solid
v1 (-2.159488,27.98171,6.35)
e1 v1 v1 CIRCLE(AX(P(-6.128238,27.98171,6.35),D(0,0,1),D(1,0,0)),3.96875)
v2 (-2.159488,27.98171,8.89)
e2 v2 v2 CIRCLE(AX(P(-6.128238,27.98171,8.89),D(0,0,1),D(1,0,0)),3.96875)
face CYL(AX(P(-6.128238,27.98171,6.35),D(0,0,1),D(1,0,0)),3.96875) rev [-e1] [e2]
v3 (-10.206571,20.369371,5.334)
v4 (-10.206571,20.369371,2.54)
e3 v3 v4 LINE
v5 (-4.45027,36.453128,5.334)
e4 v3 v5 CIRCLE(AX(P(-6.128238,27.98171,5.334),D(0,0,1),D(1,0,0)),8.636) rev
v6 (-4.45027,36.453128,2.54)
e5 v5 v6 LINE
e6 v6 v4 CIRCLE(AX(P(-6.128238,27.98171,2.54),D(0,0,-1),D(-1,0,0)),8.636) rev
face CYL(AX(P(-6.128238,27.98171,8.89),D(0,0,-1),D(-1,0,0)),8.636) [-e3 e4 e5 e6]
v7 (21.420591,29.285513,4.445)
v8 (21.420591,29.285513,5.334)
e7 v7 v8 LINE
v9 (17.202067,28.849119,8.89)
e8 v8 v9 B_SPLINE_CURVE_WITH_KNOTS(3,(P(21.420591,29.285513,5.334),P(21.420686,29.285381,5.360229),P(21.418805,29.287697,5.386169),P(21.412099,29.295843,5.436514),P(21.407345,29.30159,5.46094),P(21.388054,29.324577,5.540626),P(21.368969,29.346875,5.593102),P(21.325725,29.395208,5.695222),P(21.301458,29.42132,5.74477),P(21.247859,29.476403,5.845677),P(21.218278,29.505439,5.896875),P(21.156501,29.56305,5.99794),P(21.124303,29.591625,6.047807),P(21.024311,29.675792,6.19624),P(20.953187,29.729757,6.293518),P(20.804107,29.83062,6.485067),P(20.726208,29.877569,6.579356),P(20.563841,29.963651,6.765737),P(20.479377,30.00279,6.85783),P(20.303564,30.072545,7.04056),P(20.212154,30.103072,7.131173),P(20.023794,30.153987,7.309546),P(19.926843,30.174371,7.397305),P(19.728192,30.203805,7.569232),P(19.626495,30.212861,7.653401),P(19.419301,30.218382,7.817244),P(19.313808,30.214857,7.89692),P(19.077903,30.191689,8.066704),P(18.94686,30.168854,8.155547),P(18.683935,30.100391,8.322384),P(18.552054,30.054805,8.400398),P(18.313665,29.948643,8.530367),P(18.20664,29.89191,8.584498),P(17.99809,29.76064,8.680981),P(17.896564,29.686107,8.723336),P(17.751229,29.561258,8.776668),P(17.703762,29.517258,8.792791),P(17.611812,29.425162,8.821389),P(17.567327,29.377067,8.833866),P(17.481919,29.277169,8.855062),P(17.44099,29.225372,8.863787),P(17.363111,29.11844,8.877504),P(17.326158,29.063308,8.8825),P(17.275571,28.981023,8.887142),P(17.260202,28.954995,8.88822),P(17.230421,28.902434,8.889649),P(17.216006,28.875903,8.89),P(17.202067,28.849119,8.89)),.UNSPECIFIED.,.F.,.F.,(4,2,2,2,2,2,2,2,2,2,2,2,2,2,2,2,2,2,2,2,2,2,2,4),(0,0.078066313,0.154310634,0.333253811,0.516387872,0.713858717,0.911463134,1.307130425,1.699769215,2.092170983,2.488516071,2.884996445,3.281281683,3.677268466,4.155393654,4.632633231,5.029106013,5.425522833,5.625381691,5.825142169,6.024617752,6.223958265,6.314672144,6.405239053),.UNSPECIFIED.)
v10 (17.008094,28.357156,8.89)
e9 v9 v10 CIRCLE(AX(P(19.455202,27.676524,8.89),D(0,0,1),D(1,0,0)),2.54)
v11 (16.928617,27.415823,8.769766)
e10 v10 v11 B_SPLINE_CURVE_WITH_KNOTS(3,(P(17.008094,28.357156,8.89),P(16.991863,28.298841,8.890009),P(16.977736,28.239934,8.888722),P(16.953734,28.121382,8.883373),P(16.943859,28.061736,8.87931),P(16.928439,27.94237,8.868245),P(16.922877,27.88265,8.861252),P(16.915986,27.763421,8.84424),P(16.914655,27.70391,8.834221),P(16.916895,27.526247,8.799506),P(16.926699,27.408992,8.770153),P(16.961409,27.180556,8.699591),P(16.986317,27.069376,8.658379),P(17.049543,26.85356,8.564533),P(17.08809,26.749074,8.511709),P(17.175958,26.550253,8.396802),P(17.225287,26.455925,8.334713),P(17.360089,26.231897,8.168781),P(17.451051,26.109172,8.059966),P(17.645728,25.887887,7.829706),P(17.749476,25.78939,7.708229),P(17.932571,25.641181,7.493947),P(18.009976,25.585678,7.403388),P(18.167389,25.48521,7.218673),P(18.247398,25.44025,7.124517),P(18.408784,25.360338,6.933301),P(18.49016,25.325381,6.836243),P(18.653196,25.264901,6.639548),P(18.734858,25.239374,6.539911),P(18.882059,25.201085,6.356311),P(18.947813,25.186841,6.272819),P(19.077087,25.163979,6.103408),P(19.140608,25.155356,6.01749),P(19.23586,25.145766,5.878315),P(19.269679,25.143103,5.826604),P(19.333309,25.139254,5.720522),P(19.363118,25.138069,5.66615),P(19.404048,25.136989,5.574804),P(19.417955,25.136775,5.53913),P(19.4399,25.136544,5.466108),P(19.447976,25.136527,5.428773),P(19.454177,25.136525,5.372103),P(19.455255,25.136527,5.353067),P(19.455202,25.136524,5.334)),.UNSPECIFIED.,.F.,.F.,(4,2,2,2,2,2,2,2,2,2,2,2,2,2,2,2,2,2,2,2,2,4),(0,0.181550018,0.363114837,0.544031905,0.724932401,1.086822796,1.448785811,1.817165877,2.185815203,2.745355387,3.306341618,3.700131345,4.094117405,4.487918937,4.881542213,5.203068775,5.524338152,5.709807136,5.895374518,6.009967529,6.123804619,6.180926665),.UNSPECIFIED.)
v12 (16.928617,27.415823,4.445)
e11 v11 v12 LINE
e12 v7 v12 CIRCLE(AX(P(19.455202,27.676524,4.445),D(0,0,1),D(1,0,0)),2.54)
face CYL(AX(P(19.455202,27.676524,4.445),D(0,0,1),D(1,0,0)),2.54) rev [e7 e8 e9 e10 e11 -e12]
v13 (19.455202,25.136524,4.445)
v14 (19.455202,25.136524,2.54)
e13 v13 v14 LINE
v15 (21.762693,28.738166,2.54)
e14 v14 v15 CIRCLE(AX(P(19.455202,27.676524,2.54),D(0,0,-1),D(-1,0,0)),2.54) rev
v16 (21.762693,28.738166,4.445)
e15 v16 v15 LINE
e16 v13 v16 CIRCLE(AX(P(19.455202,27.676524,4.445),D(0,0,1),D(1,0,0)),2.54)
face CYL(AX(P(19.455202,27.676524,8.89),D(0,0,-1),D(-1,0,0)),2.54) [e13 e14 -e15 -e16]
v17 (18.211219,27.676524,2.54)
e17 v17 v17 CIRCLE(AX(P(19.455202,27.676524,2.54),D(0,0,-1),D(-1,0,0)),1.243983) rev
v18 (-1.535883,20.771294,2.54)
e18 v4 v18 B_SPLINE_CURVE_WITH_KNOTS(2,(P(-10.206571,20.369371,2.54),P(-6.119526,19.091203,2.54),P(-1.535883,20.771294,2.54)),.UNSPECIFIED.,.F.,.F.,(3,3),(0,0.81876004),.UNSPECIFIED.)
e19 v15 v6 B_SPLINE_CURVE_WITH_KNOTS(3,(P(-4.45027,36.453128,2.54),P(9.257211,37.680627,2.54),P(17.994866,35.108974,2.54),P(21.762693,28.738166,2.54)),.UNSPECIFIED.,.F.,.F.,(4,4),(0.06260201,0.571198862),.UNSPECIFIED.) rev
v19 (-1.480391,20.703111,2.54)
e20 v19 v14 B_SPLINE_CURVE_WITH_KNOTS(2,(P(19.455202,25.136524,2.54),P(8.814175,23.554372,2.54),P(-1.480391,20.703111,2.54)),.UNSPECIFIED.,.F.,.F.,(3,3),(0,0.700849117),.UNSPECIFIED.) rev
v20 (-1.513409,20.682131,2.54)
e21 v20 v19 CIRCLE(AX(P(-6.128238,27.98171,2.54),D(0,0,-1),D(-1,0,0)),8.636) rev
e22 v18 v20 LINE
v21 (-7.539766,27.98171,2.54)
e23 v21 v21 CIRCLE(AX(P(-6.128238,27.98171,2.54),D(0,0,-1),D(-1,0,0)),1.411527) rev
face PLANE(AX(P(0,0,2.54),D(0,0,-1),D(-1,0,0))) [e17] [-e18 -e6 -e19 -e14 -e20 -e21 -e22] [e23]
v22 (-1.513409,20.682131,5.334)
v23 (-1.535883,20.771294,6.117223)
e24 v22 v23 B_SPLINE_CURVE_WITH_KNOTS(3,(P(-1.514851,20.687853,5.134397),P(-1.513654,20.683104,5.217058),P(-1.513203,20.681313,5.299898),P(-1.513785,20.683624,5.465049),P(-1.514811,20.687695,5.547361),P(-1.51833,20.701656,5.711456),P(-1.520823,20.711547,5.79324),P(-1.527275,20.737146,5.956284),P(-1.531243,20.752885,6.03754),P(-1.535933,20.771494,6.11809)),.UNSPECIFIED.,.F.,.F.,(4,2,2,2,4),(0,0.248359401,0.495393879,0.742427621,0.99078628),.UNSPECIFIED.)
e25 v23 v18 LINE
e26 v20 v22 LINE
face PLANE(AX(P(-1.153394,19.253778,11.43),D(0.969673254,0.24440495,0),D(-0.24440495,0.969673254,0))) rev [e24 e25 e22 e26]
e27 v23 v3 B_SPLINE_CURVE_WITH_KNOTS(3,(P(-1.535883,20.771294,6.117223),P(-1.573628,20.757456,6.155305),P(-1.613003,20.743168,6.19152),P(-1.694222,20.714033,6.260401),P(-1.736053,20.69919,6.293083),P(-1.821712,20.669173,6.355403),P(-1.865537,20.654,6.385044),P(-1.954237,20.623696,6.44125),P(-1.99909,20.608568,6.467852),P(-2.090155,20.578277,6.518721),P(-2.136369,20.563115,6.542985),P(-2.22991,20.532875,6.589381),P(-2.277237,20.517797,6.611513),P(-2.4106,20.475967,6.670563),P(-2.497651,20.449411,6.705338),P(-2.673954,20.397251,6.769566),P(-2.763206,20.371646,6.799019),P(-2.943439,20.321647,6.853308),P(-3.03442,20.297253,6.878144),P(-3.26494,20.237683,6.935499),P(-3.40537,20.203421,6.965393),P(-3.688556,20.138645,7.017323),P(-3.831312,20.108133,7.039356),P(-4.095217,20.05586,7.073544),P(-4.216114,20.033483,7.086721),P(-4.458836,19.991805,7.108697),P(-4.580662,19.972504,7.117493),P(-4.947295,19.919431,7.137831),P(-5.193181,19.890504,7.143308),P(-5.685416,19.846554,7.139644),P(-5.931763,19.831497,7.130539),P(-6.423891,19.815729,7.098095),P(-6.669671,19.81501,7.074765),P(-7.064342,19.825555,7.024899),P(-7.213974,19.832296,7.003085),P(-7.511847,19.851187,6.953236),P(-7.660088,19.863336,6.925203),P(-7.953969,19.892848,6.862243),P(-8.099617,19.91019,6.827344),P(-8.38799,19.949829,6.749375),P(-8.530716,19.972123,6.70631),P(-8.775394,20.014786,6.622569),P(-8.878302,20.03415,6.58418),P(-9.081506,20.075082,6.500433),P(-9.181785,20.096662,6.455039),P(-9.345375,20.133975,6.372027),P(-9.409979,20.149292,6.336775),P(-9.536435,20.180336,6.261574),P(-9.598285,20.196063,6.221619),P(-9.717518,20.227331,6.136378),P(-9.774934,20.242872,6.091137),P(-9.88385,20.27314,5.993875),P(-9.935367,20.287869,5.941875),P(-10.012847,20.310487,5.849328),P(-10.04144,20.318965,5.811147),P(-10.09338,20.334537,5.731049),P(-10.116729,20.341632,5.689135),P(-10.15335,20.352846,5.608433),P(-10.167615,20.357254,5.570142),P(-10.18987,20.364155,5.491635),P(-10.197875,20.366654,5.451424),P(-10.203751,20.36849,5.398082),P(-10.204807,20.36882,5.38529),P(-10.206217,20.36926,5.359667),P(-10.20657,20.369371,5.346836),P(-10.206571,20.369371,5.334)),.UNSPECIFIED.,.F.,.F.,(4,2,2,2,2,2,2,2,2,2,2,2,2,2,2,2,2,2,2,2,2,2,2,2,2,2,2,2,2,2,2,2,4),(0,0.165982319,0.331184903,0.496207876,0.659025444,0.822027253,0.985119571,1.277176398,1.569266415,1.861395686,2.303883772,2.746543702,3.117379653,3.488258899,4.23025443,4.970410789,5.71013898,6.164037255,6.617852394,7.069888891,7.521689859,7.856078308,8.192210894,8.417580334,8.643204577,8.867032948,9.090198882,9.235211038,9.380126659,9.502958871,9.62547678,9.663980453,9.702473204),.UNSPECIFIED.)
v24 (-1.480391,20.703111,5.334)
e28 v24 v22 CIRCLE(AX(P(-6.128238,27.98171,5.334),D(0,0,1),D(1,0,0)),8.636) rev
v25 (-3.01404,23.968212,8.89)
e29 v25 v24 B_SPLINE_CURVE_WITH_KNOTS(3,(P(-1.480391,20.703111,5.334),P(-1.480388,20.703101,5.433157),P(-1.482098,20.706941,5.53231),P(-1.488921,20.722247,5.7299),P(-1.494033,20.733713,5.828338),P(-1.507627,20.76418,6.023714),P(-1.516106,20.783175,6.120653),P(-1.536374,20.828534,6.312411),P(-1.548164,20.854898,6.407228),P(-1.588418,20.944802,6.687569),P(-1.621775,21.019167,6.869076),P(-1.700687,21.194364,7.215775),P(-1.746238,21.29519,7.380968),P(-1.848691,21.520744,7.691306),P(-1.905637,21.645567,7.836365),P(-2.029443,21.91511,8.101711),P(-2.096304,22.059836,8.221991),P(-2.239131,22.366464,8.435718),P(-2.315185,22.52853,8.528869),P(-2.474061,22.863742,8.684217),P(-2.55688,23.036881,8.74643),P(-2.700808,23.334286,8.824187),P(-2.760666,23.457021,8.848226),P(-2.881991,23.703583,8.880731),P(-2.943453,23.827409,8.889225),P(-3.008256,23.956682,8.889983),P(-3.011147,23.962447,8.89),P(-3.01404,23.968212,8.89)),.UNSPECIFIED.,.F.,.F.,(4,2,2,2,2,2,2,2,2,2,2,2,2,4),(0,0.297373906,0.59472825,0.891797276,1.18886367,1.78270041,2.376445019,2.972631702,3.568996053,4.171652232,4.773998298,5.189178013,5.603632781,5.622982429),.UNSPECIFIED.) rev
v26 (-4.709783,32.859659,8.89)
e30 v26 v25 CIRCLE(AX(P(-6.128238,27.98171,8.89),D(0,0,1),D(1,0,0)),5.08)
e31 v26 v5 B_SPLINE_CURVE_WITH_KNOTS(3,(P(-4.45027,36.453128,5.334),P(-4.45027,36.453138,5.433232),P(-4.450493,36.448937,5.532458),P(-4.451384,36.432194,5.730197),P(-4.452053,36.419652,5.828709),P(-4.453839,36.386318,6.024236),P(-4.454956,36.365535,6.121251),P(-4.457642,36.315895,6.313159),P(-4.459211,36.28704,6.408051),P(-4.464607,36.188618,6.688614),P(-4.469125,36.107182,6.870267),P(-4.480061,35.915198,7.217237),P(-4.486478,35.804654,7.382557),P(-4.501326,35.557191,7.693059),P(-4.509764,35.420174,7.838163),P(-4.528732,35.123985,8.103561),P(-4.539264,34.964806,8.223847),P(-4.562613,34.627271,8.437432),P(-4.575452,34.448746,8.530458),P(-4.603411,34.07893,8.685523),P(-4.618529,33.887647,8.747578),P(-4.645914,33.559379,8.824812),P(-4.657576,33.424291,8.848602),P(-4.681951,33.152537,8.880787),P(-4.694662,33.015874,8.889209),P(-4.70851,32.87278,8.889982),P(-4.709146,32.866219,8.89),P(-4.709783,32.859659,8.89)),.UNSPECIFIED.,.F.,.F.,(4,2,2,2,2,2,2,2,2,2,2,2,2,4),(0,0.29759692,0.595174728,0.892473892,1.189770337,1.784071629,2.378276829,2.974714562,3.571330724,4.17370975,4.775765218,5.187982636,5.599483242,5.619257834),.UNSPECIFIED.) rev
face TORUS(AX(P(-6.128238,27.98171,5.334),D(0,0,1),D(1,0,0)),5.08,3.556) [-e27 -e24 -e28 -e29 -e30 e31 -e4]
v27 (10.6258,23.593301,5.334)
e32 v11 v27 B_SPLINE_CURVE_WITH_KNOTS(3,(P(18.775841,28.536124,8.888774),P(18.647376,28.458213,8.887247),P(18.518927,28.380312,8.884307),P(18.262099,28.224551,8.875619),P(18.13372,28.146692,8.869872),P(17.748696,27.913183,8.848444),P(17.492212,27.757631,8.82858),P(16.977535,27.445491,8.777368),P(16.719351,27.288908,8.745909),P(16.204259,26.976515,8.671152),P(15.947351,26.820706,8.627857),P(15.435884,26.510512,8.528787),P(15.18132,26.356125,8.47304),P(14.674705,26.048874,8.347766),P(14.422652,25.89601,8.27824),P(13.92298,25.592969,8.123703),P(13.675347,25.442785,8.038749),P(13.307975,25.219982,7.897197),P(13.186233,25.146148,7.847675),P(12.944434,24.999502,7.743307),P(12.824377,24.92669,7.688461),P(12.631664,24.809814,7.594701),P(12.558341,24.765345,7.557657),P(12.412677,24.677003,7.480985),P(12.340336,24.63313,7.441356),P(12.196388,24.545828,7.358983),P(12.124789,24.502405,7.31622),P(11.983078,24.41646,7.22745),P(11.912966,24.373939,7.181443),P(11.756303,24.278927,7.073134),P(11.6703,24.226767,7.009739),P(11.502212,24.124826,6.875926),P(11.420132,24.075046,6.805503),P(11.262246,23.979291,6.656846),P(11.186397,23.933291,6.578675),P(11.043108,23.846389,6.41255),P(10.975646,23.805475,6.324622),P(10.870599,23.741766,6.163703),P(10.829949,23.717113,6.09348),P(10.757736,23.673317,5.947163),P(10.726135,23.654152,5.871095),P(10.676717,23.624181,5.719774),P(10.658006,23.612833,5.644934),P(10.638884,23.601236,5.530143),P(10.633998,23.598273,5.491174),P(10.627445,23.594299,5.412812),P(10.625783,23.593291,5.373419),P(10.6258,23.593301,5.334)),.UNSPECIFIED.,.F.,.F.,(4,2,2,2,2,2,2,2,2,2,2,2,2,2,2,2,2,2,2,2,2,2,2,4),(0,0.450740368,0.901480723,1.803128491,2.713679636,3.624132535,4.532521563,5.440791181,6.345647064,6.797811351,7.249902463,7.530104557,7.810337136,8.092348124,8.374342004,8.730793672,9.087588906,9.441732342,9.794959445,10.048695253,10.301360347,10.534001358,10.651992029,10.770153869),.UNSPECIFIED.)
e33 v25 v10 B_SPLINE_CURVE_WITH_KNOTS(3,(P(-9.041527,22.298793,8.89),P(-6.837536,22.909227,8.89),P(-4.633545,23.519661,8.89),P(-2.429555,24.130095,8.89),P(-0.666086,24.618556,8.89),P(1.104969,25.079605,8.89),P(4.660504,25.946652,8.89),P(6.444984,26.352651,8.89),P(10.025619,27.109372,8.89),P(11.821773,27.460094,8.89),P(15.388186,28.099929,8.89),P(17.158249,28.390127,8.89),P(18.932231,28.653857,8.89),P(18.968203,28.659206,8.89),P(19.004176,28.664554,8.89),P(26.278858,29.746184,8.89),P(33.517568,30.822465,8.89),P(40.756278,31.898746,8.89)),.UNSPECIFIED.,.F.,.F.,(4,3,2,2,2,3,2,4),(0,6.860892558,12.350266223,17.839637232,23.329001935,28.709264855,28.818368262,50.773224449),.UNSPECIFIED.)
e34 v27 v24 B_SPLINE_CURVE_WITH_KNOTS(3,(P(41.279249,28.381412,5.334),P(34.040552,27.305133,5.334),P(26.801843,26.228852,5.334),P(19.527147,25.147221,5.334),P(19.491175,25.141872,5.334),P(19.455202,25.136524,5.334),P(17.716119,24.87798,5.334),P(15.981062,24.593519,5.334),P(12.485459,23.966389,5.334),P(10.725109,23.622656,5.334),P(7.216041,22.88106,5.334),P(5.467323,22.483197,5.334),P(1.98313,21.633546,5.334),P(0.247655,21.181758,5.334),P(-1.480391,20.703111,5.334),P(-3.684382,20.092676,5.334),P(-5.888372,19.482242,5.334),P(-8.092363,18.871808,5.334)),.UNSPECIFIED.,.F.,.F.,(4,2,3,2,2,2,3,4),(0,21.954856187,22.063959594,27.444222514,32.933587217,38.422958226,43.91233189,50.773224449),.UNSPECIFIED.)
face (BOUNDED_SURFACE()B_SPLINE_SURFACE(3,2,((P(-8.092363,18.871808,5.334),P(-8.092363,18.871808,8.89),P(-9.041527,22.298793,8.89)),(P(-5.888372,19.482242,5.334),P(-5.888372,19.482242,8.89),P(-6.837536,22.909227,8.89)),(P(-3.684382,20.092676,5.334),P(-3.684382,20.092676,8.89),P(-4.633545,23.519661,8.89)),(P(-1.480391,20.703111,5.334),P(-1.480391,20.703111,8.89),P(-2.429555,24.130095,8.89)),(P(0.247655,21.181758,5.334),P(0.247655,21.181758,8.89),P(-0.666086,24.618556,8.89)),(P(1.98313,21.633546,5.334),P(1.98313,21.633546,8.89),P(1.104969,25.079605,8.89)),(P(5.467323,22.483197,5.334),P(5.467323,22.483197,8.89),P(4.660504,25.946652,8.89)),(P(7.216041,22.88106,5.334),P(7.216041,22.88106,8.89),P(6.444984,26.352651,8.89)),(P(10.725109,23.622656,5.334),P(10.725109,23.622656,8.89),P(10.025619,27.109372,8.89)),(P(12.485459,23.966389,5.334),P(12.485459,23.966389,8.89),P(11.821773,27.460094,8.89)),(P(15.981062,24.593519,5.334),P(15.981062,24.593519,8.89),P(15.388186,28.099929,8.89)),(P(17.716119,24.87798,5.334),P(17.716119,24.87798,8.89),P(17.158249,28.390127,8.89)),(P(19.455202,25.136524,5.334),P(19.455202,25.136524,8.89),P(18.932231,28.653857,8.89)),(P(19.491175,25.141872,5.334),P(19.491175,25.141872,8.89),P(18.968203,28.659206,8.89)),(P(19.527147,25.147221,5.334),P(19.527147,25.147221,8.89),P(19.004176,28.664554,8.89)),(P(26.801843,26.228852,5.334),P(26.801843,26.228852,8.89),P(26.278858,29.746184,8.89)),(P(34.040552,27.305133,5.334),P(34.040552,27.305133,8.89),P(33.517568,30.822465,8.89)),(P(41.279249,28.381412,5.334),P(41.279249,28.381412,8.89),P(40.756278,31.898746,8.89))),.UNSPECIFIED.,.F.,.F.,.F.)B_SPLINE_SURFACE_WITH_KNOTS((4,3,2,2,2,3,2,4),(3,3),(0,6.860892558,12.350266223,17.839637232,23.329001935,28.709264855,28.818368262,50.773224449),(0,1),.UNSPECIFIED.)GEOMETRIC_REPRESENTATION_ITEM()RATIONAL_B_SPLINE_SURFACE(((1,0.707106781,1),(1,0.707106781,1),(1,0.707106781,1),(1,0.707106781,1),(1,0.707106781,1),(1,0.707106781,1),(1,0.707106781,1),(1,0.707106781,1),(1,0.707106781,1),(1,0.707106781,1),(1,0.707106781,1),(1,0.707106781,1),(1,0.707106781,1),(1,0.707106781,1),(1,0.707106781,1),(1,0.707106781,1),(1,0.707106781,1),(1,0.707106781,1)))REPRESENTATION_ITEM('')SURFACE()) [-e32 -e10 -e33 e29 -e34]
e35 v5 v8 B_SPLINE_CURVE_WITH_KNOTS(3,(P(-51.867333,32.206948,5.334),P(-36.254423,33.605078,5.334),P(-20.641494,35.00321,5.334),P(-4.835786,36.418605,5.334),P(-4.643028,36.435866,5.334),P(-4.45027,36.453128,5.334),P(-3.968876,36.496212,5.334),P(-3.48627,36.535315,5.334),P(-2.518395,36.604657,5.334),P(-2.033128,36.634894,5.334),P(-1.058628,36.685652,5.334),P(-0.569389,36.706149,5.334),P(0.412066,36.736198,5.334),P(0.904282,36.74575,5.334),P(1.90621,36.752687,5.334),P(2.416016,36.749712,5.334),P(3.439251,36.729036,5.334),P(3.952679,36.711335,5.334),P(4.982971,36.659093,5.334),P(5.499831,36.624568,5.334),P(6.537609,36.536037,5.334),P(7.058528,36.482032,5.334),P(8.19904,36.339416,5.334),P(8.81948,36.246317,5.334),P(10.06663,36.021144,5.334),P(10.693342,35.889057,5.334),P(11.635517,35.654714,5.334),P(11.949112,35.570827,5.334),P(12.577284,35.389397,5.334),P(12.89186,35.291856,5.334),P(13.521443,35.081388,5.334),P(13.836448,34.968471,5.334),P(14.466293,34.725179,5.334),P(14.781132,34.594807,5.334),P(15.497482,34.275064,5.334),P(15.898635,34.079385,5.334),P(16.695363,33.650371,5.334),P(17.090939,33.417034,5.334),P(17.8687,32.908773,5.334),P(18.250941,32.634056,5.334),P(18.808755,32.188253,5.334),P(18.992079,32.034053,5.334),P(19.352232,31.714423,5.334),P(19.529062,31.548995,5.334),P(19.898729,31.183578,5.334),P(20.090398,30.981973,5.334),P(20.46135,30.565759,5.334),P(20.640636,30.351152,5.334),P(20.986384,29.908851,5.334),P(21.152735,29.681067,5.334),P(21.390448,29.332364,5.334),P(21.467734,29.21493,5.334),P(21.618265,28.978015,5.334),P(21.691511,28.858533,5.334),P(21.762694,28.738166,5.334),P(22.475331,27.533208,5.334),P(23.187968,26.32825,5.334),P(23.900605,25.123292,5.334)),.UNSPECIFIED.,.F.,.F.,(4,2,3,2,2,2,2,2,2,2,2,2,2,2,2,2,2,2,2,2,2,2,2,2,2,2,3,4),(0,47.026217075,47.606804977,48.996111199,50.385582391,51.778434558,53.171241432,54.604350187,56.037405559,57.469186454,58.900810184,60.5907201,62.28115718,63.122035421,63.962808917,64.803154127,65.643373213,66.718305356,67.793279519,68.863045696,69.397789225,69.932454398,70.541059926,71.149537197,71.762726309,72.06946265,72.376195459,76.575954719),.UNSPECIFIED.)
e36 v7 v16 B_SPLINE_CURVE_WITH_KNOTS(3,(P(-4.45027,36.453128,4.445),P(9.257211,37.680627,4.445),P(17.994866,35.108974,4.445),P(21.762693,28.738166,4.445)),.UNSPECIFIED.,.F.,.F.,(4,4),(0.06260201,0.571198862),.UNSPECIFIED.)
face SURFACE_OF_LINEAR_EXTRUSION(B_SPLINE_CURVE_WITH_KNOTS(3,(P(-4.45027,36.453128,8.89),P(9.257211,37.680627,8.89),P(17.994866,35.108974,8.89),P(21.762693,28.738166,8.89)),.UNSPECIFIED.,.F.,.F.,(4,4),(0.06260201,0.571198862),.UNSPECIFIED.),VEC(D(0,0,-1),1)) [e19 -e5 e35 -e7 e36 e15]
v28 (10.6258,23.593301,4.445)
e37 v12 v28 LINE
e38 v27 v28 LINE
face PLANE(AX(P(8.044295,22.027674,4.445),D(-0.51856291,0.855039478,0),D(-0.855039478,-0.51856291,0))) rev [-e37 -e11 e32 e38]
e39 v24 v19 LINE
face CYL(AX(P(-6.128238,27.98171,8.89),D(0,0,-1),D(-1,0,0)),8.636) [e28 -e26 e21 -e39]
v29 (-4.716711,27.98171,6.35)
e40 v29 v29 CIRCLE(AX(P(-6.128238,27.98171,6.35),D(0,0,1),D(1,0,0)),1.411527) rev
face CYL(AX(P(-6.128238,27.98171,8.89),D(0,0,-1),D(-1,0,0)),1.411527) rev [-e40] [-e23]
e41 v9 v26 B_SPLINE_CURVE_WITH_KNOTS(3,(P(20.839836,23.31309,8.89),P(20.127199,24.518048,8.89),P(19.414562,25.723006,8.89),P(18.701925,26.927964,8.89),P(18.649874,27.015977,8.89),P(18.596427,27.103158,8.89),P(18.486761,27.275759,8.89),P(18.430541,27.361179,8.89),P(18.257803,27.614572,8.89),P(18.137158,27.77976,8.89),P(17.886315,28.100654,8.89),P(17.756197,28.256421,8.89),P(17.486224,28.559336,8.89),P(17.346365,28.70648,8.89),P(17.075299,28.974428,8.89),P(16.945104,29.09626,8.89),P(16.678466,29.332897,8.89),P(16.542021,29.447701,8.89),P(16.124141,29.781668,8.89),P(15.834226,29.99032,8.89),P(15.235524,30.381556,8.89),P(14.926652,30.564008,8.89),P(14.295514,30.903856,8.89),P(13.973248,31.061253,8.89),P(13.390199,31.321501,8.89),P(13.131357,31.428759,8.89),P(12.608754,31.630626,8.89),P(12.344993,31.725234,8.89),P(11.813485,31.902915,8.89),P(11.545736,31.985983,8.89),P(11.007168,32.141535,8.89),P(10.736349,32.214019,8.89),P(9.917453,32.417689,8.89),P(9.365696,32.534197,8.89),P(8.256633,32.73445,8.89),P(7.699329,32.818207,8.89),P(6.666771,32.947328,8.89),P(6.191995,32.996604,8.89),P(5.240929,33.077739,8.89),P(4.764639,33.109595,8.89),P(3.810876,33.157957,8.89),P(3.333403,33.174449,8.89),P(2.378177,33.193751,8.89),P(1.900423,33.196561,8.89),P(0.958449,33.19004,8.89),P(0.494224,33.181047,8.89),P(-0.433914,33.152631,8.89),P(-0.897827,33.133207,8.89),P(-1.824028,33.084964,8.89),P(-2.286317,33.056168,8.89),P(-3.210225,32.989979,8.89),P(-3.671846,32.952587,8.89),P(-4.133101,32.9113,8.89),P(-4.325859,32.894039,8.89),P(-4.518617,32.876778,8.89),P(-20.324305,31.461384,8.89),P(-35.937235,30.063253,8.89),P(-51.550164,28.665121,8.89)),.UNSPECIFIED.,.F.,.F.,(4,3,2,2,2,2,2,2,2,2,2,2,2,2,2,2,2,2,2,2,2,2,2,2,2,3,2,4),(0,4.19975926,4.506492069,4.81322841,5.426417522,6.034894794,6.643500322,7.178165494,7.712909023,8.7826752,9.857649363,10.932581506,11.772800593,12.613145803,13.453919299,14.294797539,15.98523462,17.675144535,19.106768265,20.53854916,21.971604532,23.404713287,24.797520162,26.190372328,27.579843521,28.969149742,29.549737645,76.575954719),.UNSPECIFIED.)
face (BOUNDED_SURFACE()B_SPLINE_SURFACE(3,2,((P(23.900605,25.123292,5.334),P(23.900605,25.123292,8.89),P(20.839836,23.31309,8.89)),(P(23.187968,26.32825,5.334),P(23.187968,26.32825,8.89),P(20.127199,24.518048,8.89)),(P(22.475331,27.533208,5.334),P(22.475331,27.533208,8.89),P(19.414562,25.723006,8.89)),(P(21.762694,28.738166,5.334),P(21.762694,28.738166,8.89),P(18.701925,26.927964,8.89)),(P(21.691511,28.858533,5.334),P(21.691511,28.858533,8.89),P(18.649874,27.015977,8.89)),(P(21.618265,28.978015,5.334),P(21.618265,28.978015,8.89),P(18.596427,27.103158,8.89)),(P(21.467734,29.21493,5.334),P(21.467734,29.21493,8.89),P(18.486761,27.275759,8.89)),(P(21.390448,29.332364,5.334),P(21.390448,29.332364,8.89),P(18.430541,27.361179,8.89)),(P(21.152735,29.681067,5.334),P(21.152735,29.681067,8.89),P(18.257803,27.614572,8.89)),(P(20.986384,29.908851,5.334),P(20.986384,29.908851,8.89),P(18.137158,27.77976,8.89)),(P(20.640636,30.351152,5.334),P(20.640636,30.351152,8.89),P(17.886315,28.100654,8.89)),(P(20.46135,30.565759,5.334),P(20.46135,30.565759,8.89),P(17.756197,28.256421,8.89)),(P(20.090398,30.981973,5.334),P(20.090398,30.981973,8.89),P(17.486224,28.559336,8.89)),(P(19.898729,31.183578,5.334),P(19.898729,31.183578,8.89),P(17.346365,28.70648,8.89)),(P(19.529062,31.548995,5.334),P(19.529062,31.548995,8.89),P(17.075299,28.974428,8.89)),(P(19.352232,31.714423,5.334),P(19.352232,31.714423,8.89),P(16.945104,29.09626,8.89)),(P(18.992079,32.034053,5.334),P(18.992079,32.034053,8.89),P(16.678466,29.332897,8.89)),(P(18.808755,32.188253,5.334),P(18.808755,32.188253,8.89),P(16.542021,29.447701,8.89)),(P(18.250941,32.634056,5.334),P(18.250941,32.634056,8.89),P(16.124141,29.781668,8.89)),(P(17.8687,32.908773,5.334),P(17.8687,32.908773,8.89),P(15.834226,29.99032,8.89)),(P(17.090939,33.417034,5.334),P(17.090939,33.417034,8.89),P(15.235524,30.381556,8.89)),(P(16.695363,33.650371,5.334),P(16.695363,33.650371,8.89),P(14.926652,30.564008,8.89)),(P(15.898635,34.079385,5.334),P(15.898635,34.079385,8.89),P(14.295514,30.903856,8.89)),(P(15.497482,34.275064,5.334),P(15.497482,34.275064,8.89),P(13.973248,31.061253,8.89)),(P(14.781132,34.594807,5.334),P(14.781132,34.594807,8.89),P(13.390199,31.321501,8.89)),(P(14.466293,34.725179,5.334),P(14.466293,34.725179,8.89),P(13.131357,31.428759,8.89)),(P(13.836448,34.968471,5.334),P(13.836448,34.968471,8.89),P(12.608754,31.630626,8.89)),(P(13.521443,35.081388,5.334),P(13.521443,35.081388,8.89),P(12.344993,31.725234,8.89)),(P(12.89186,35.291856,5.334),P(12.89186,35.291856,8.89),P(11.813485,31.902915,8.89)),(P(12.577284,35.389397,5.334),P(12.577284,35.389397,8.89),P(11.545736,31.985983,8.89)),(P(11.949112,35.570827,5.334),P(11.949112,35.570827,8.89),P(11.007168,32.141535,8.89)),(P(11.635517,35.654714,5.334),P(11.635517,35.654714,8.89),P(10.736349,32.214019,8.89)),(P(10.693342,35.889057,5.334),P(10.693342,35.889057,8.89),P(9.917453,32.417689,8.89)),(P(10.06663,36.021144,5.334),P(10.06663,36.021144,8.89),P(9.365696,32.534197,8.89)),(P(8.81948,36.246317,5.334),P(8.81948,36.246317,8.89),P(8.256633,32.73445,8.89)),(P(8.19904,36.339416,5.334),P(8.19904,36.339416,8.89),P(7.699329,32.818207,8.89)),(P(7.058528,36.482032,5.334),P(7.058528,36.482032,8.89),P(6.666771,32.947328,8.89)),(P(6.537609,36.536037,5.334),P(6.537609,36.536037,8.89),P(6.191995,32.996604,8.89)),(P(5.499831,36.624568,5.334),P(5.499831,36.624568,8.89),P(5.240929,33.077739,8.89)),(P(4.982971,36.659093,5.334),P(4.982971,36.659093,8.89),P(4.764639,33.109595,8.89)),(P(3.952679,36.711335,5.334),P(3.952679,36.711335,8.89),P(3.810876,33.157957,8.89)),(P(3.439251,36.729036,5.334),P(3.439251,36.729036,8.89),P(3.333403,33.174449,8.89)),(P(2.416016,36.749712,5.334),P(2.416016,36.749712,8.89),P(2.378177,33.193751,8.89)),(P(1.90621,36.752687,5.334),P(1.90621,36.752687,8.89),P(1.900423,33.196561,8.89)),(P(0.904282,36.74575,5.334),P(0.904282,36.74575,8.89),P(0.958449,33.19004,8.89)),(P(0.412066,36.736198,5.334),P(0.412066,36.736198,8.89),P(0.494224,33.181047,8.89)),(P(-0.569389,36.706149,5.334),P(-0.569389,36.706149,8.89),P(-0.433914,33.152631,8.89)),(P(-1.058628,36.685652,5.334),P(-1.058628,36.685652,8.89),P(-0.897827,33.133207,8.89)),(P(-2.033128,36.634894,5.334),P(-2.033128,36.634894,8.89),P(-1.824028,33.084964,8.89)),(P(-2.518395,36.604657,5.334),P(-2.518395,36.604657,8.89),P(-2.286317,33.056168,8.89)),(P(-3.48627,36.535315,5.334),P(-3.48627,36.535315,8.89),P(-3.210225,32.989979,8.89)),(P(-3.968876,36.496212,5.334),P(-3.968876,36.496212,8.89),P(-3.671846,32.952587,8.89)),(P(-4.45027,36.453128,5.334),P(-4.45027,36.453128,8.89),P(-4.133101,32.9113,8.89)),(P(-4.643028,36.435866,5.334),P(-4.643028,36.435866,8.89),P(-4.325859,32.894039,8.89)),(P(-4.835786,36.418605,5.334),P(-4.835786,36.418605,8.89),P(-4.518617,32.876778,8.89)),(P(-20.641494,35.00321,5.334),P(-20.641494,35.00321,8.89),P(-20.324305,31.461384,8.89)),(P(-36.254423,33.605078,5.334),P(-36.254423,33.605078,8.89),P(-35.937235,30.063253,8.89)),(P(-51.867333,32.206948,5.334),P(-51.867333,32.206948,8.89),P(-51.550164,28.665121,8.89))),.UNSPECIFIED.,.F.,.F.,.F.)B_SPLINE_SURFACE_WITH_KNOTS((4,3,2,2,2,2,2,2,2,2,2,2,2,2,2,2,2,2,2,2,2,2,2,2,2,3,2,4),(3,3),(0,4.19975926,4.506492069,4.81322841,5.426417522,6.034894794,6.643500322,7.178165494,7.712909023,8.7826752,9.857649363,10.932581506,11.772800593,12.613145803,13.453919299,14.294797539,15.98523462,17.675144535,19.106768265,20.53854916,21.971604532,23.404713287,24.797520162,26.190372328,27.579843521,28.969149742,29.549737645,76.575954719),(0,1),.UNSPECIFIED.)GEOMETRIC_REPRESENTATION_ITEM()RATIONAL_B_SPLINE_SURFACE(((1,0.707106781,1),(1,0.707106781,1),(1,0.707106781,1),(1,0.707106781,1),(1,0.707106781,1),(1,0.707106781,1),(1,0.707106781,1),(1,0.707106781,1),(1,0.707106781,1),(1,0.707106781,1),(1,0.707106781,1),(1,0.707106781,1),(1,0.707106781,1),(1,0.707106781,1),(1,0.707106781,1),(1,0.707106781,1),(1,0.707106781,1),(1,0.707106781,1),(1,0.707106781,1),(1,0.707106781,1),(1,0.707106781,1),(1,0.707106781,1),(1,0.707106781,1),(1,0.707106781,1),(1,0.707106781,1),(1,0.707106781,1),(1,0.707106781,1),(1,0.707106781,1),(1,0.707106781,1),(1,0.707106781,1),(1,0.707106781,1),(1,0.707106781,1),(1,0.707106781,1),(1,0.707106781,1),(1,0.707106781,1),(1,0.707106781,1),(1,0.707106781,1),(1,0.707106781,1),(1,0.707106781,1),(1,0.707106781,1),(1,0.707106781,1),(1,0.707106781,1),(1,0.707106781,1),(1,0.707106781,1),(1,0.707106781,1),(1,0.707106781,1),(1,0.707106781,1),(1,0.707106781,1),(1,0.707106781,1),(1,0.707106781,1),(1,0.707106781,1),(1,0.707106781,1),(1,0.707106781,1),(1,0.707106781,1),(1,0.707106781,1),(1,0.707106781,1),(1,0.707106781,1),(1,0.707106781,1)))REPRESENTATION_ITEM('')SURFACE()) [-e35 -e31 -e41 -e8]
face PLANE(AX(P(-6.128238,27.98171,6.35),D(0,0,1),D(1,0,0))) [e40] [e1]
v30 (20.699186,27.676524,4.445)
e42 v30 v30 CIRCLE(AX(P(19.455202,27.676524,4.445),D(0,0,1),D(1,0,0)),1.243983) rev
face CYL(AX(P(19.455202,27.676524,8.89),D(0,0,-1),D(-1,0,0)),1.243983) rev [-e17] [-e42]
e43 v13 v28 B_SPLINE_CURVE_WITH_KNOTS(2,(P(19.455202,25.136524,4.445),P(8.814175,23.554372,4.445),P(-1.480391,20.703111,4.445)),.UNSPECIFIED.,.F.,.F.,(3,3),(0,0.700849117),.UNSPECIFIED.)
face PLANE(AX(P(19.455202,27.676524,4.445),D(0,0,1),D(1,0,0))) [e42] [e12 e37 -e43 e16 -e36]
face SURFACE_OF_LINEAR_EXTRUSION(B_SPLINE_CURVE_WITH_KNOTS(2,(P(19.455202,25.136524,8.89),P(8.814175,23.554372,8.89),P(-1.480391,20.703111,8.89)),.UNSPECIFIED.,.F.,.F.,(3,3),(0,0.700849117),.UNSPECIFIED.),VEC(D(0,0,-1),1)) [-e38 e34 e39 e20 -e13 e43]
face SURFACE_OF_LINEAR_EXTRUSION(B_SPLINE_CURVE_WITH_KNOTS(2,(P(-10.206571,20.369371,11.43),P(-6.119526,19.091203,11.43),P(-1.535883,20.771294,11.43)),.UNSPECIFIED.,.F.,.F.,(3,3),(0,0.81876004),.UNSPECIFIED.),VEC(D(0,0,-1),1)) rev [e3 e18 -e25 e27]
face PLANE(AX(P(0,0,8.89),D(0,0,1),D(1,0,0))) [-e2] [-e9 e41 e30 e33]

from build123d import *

# Parameters (mm, degrees)
BOSS_EXTRUDE1_OUTLINE_R   = 1.411527177
BOSS_EXTRUDE1_OUTLINE_R_2 = 1.243983369
BOSS_EXTRUDE1_DEPTH       = 8.89
CUT_EXTRUDE1_START        = -4.445
SKETCH3_R                 = 2.54
CUT_EXTRUDE1_DEPTH        = 4.445
FILLET2_R                 = 3.556
SKETCH4_W                 = 38.788702954
SKETCH4_H                 = 29.49823266
CUT_EXTRUDE2_DEPTH        = 2.54
SKETCH5_R                 = 3.96875
CUT_EXTRUDE6_DEPTH        = 2.54
CUT_EXTRUDE9_DEPTH        = 4.445
CUT_EXTRUDE10_DEPTH       = 8.89


# Read off the part's stored shape, not the designer's step: Boss-Extrude1
with BuildPart() as part:
    # Boss-Extrude1 outline → Boss-Extrude1 (new body)
    with BuildSketch(Plane.XY):
        with BuildLine():
            add(Edge.make_bspline(
                [(-4.450270059, 36.453127637), (9.257211294, 37.68062732), (17.994865779, 35.108973576), (21.762693397, 28.738166405)],
                knots=[0.06260201, 0.06260201, 0.06260201, 0.06260201, 0.571198862, 0.571198862, 0.571198862, 0.571198862], degree=3))
            ThreePointArc((-4.450270059, 36.453127637), (-14.614683226, 26.381475664), (-1.480390785, 20.703110531))
            add(Edge.make_bspline(
                [(19.455202419, 25.136523629), (8.814175151, 23.55437226), (-1.480390785, 20.703110531)],
                knots=[0, 0, 0, 0.700849117, 0.700849117, 0.700849117], degree=2))
            ThreePointArc((19.455202419, 25.136523629), (21.593913789, 26.306299678), (21.762693397, 28.738166405))
        make_face()
        with Locations((-6.128238366, 27.981709907)):
            Circle(BOSS_EXTRUDE1_OUTLINE_R, mode=Mode.SUBTRACT)
        with Locations((19.455202419, 27.676523629)):
            Circle(BOSS_EXTRUDE1_OUTLINE_R_2, mode=Mode.SUBTRACT)
    extrude(amount=BOSS_EXTRUDE1_DEPTH)

    # Sketch3 → Cut-Extrude1 (cut)
    with BuildSketch(Plane.XY.offset(8.89).offset(CUT_EXTRUDE1_START)):
        with Locations((19.455202419, 27.676523629)):
            Circle(SKETCH3_R)
    extrude(amount=CUT_EXTRUDE1_DEPTH, mode=Mode.SUBTRACT)

    # Fillet2
    fillet2_edges = [part.edges().sort_by_distance(p)[0] for p in [
        (-14.614683226, 26.381475664, 8.89),
        (8.919366654, 23.241027384, 8.89),
        (9.568834416, 36.110759147, 8.89),
    ]]
    fillet(fillet2_edges, radius=FILLET2_R)

    # Sketch4 → Cut-Extrude2 (cut)
    with BuildSketch(Plane(origin=(0, 0, 0), x_dir=(-1, 0, 0), z_dir=(0, 0, -1))):
        with Locations((-4.403454377, 29.061669641)):
            Rectangle(SKETCH4_W, SKETCH4_H)
    extrude(amount=-CUT_EXTRUDE2_DEPTH, mode=Mode.SUBTRACT)

    # Sketch5 → Cut-Extrude6 (cut)
    with BuildSketch(Plane.XY.offset(8.89)):
        with Locations((-6.128238366, 27.981709907)):
            Circle(SKETCH5_R)
    extrude(amount=-CUT_EXTRUDE6_DEPTH, mode=Mode.SUBTRACT)

    # Sketch11 → Cut-Extrude9 (cut)
    with BuildSketch(Plane.XY.offset(8.89)):
        Polygon((8.044294619, 22.027673787), (18.775840599, 28.536123817), (19.455202419, 27.676523629), (23.93696494, 27.676523629), (25.091261189, 21.861175279), (8.722262202, 18.612070842), align=None)
    extrude(amount=-CUT_EXTRUDE9_DEPTH, mode=Mode.SUBTRACT)

    # Sketch13 → Cut-Extrude10 (cut)
    with BuildSketch(Plane(origin=(0, 0, 2.54), x_dir=(-1, 0, 0), z_dir=(0, 0, -1))):
        with BuildLine():
            Line((10.206570894, 20.369371253), (8.596583203, 18.138185272))
            Line((8.596583203, 18.138185272), (1.153394416, 19.253778262))
            Line((1.153394416, 19.253778262), (1.535882515, 20.771294499))
            add(Edge.make_bspline(
                [(1.535882515, 20.771294499), (6.119525821, 19.09120268), (10.206570894, 20.369371253)],
                knots=[0, 0, 0, 0.81876004, 0.81876004, 0.81876004], degree=2))
        make_face()
    extrude(amount=-CUT_EXTRUDE10_DEPTH, mode=Mode.SUBTRACT)


solid = part.part
